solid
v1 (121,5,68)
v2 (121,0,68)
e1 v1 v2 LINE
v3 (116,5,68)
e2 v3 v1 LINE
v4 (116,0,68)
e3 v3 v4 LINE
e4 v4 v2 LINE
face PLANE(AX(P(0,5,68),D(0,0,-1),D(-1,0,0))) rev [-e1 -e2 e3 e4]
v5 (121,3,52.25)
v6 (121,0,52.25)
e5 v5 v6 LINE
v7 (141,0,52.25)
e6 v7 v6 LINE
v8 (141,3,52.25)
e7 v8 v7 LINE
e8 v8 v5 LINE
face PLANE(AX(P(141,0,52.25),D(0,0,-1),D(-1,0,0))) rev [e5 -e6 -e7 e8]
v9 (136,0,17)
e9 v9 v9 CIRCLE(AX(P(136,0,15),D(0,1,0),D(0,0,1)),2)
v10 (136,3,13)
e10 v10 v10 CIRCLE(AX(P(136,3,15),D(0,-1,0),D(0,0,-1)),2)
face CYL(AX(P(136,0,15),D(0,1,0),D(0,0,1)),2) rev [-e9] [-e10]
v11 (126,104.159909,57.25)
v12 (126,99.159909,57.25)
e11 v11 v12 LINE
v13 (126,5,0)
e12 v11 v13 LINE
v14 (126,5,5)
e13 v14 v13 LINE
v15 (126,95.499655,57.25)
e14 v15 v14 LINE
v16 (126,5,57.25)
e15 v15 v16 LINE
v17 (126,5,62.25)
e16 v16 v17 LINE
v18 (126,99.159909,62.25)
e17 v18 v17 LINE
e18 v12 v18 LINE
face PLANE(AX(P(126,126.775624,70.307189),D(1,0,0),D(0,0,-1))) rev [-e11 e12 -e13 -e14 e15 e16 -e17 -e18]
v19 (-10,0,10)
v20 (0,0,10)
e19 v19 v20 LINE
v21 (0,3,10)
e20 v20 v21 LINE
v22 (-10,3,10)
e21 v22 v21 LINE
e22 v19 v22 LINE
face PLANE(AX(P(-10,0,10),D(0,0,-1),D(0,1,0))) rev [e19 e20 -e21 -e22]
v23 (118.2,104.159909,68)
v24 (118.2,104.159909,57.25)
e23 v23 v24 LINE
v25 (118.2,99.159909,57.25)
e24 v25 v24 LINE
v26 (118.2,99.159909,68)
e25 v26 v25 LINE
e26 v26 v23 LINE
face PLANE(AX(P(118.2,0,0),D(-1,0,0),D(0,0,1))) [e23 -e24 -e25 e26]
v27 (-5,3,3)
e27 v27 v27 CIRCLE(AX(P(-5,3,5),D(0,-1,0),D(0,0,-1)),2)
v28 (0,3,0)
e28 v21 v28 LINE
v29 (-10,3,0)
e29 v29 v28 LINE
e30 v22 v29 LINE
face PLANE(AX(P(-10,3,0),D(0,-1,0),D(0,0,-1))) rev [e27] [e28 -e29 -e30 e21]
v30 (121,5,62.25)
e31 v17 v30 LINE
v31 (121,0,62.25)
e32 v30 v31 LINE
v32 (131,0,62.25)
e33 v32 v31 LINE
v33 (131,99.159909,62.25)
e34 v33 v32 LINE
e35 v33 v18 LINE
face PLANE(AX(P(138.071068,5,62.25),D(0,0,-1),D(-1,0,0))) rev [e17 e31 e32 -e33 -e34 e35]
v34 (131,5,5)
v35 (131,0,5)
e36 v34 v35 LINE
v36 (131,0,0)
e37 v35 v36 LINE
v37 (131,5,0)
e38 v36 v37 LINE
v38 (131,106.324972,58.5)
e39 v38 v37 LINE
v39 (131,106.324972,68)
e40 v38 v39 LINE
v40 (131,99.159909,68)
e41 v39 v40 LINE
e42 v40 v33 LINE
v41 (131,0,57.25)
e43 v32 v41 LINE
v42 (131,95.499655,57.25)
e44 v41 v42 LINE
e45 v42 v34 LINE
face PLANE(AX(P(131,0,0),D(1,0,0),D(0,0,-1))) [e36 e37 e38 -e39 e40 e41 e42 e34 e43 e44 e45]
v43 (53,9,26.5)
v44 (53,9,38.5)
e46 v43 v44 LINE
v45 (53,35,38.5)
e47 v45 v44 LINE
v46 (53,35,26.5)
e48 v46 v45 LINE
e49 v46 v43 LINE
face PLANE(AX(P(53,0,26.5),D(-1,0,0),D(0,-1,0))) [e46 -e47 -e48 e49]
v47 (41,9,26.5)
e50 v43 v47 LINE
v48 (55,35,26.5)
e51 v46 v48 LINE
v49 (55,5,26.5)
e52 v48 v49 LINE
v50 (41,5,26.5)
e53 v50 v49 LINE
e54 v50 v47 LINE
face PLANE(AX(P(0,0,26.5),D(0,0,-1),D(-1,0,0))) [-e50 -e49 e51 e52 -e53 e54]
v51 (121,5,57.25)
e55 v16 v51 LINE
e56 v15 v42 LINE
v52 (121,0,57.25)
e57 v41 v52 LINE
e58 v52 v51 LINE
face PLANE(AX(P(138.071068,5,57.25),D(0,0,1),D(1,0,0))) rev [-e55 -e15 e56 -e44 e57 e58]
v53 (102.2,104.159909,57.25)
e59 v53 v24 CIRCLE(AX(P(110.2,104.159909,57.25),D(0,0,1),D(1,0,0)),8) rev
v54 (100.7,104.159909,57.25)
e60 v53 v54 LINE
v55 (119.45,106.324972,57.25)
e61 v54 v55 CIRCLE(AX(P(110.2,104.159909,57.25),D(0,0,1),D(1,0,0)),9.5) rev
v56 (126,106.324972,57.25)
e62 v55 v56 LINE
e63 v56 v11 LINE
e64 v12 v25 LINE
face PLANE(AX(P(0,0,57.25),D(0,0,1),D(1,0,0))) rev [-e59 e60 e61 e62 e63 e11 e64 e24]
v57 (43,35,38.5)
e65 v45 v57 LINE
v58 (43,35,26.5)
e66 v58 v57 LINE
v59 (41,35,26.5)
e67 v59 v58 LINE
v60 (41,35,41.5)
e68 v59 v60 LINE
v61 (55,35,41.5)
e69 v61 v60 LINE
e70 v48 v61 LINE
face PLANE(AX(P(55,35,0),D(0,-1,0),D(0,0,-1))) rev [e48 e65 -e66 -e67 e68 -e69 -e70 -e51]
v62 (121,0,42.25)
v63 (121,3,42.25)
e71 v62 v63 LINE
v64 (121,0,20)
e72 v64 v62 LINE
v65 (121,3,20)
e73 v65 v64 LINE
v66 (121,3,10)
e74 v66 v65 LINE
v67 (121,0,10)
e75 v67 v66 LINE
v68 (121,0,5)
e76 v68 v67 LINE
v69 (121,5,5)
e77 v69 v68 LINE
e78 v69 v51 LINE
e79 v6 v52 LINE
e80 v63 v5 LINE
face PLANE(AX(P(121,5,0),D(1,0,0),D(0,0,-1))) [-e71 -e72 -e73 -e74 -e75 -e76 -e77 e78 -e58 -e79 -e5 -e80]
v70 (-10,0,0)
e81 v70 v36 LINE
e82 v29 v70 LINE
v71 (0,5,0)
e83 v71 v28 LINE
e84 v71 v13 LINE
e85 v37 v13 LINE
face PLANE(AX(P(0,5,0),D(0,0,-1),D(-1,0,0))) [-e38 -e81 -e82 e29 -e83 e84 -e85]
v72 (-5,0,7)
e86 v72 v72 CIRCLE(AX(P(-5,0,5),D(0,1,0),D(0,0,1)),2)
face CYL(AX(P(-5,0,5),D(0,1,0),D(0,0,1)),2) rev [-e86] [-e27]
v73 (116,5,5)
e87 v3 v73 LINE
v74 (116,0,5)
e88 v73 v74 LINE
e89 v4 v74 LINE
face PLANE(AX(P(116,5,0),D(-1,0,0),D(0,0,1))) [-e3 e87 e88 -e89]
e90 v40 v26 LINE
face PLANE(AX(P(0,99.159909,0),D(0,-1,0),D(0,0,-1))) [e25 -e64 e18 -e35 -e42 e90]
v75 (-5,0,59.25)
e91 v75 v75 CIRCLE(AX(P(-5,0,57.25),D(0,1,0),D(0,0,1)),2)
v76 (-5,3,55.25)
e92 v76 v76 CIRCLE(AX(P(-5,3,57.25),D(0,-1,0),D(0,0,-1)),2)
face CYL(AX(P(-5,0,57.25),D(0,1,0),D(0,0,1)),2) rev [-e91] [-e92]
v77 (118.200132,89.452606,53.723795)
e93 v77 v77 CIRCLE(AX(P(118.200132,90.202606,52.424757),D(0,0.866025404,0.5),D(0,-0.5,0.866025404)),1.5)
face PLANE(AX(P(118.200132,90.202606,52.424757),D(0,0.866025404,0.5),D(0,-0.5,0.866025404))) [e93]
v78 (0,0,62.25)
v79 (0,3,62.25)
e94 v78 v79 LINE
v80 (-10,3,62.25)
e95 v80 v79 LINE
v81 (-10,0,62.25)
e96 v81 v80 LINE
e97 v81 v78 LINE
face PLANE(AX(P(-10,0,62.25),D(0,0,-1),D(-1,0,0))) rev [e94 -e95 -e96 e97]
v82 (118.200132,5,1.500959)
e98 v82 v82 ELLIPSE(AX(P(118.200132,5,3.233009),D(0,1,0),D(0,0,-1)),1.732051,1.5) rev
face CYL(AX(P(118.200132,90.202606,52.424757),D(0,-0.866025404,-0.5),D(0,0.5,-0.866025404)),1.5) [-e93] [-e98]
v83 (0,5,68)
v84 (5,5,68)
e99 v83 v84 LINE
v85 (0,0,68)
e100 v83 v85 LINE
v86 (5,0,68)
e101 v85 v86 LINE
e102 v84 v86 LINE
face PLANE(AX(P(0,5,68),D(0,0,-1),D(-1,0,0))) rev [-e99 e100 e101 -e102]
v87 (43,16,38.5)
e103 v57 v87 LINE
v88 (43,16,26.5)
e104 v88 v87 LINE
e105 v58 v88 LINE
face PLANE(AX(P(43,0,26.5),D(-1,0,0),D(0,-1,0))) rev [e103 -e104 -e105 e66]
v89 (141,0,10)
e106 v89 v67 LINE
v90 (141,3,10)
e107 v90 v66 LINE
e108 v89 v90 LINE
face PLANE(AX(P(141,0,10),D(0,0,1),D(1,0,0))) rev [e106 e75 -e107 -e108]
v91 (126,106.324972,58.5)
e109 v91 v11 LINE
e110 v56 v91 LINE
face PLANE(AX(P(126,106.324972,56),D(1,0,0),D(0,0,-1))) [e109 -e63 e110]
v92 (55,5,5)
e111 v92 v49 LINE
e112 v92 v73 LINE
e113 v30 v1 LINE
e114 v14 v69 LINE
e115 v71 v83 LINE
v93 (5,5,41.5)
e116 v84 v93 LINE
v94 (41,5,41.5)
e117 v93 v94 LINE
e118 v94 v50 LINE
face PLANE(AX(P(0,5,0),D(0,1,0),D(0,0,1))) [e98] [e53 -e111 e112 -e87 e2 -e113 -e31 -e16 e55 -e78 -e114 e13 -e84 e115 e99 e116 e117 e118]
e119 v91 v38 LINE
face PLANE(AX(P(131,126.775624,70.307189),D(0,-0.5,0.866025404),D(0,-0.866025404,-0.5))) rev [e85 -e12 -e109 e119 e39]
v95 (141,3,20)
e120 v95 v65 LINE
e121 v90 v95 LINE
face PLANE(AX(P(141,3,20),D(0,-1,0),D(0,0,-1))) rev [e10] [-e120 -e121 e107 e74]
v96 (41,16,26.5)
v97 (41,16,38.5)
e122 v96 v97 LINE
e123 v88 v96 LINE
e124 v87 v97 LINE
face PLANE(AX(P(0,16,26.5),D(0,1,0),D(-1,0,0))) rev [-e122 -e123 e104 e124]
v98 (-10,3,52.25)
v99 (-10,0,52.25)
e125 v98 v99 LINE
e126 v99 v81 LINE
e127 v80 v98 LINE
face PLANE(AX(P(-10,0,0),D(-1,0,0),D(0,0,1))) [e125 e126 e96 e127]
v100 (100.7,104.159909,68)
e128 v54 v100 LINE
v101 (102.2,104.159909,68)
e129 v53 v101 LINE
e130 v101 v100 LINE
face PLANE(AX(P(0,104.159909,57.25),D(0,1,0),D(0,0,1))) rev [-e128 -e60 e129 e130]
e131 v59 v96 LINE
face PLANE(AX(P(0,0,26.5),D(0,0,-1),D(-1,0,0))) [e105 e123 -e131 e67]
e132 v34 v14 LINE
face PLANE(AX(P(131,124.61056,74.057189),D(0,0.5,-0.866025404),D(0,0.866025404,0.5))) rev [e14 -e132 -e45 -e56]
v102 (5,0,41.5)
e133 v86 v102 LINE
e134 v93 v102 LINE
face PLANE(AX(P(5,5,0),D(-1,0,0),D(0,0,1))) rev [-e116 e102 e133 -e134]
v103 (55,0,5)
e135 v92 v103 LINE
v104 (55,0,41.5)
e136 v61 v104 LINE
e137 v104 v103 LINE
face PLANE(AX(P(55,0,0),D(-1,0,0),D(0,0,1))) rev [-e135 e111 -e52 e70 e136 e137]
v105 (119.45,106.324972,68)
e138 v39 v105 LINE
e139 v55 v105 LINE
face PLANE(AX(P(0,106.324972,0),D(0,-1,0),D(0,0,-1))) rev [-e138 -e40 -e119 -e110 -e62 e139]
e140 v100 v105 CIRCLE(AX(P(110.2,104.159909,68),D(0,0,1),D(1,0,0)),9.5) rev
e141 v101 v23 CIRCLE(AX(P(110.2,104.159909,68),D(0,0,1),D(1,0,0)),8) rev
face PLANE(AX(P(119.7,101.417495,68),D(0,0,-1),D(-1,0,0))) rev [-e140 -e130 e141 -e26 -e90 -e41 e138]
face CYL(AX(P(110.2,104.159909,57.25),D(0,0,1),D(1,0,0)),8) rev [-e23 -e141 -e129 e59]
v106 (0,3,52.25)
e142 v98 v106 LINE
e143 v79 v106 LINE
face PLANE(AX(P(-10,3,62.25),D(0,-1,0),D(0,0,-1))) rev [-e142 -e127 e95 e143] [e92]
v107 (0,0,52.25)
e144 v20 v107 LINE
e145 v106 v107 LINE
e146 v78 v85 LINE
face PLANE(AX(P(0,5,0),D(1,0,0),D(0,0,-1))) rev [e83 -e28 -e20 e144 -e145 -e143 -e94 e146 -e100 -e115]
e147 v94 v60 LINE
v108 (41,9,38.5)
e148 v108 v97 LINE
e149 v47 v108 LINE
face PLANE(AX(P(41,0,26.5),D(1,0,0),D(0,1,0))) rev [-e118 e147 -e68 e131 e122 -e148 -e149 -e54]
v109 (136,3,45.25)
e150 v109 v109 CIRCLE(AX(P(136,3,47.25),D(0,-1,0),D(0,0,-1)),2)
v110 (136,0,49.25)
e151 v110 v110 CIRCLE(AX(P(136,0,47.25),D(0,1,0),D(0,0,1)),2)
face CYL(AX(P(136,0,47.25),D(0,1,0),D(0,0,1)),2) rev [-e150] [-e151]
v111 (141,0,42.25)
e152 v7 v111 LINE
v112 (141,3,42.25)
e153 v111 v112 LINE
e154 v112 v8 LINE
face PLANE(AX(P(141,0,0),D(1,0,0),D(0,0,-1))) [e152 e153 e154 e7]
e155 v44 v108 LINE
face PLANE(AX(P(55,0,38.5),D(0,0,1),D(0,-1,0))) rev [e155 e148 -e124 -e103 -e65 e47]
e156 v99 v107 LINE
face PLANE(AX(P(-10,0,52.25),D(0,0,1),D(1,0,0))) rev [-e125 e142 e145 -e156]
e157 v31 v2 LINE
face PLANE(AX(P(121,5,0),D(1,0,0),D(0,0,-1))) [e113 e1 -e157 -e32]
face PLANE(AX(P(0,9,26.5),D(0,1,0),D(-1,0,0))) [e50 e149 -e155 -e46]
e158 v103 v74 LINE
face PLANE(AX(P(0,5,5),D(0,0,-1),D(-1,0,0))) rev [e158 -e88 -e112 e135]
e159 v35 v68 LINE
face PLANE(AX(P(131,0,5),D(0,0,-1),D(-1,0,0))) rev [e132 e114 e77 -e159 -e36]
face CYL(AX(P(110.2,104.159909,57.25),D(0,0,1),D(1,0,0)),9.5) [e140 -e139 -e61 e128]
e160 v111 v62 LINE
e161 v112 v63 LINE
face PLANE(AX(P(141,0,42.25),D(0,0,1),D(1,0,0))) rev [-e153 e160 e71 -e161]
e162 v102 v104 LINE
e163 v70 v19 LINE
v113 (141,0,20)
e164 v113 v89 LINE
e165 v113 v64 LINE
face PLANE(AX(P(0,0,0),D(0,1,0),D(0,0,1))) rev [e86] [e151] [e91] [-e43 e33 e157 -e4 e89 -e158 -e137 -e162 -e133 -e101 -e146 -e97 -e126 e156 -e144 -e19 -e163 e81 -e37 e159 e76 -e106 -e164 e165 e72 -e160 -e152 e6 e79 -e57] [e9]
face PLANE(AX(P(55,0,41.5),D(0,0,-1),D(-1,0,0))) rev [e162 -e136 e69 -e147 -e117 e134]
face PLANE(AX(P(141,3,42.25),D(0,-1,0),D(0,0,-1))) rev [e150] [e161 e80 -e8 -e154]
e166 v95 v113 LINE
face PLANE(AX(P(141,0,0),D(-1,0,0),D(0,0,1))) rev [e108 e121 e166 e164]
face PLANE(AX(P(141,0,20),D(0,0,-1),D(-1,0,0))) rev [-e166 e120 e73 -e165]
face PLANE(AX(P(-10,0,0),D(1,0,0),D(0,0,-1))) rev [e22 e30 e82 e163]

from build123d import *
from OCP.BRepAlgoAPI import BRepAlgoAPI_Cut
from OCP.TopTools import TopTools_ListOfShape

# Parameters (mm, degrees)
BOSS_EXTRUDE1_DEPTH              = 5
SKETCH2_R                        = 1.5
BOSS_EXTRUDE2_DEPTH              = 100
SKETCH3_W                        = 5
SKETCH3_H                        = 5
BOSS_EXTRUDE3_DEPTH              = 10
SKETCH5_W                        = 5
SKETCH5_H                        = 4.330127019
BOSS_EXTRUDE4_DEPTH              = 117
SKETCH6_W                        = 5
SKETCH6_H                        = 5
BOSS_EXTRUDE5_DEPTH              = 20
BOSS_EXTRUDE6_DEPTH              = 15
SKETCH9_W                        = 5
SKETCH9_H                        = 5
BOSS_EXTRUDE7_DEPTH              = 10
SKETCH10_W                       = 5
SKETCH10_H                       = 5
BOSS_EXTRUDE8_DEPTH              = 99.159909
SKETCH11_W                       = 10
SKETCH11_H                       = 3
BOSS_EXTRUDE9_DEPTH              = 10
CUT_EXTRUDE1_DEPTH               = 187.084790711
CUT_EXTRUDE1_DEPTH_BACK          = 187.084790711
SKETCH13_R                       = 2
SKETCH14_W                       = 10
SKETCH14_H                       = 3
BOSS_EXTRUDE10_DEPTH             = 20
CUT_EXTRUDE2_DEPTH               = 194.255140511
CUT_EXTRUDE2_DEPTH_BACK          = 194.255140511
SKETCH15_R                       = 2
BOSS_EXTRUDE11_DEPTH             = 7.8
CUT_EXTRUDE3_DEPTH               = 187.016127587
CUT_EXTRUDE3_DEPTH_BACK          = 187.016127587
SKETCH17_W                       = 22.17902444
SKETCH17_H                       = 20
BOSS_EXTRUDE12_DEPTH             = 5.75
BOSS_EXTRUDE12_DEPTH_BACK        = 5
SKETCH19_W                       = 1.5
SKETCH19_H                       = 10.75
BOSS_EXTRUDE13_DEPTH             = 2.742414
SKETCH21_W                       = 1.5
SKETCH21_H                       = 1
BOSS_EXTRUDE15_DEPTH             = 1
BOSS_EXTRUDE17_REACH             = 195.512
CUT_EXTRUDE4_START               = 2
SKETCH23_W                       = 7.8
SKETCH23_H                       = 12
CUT_EXTRUDE4_DEPTH               = 10
BOSS_EXTRUDE19_DEPTH             = 5
BOSS_EXTRUDE19_DEPTH_BACK        = 2.165064
SKETCH23_2_W                     = 7.8
SKETCH23_2_H                     = 12
CUT_EXTRUDE5_DEPTH               = 1.25
BOSS_EXTRUDE20_REACH             = 188.016
SKETCH25_W                       = 5
SKETCH25_H                       = 4.330127019
SKETCH26_W                       = 5
SKETCH26_H                       = 2.16506351
CUT_EXTRUDE6_DEPTH               = 5
SKETCH27_W                       = 5.75
SKETCH27_H                       = 7.16506351
BOSS_EXTRUDE21_DEPTH             = 5
SKETCH29_W                       = 3
SKETCH29_H                       = 30
BOSS_EXTRUDE22_DEPTH             = 55
SKETCH30_W                       = 5
SKETCH30_H                       = 3
BOSS_EXTRUDE23_DEPTH             = 5
SKETCH31_W                       = 5
SKETCH31_H                       = 5
BOSS_EXTRUDE24_DEPTH             = 33.5
SKETCH32_W                       = 2
SKETCH32_H                       = 19
BOSS_EXTRUDE25_DEPTH             = 12
SKETCH34_W                       = 41
SKETCH34_H                       = 3
CUT_EXTRUDE7_DEPTH               = 30
SKETCH35_W                       = 14
SKETCH35_H                       = 12
BOSS_EXTRUDE26_DEPTH             = 7
BOSS_EXTRUDE27_REACH             = 187.154
SKETCH36_W                       = 9
SKETCH36_H                       = 5
BOSS_EXTRUDE27_DIRECTION_2_REACH = 187.154
SKETCH37_W                       = 41.5
SKETCH37_H                       = 5
BOSS_EXTRUDE28_DEPTH             = 41


with BuildPart() as part:
    # Sketch1 → Boss-Extrude1 (new body)
    with BuildSketch(Plane(origin=(0, 0, 0), x_dir=(1, 0, 0), z_dir=(0, 1, 0))):
        Polygon((121, 0), (0, 0), (0, -68), (5, -68), (5, -5), (116, -5), (116, -68), (121, -68), align=None)
    extrude(amount=BOSS_EXTRUDE1_DEPTH)

    # Sketch2 → Boss-Extrude2 (add)
    with BuildSketch(Plane(origin=(0, 3.75, 2.165063509), x_dir=(1, 0, 0), z_dir=(0, 0.866025403784438, 0.500000000000001))):
        with Locations(Location((118.200131686, -0.299868314, 0), (0, 0, 90))):
            Circle(SKETCH2_R)
    extrude(amount=BOSS_EXTRUDE2_DEPTH)

    # Sketch3 → Boss-Extrude3 (add)
    with BuildSketch(Plane(origin=(121, 0, 0), x_dir=(0, 0, -1), z_dir=(1, 0, 0))):
        with Locations((-2.5, 2.5)):
            Rectangle(SKETCH3_W, SKETCH3_H)
    extrude(amount=BOSS_EXTRUDE3_DEPTH)

    # Sketch5 → Boss-Extrude4 (add)
    with BuildSketch(Plane(origin=(0, 3.75, 2.165063509), x_dir=(1, 0, 0), z_dir=(0, 0.866025403784438, 0.500000000000001))):
        with Locations((128.5, 0.33493649)):
            Rectangle(SKETCH5_W, SKETCH5_H)
    extrude(amount=BOSS_EXTRUDE4_DEPTH)

    # Sketch6 → Boss-Extrude5 (add)
    with BuildSketch(Plane(origin=(0, 1.25, -2.165063509), x_dir=(-1, 0, 0), z_dir=(0, 0.500000000000001, -0.8660254037844382))):
        with Locations((-128.5, 118.830127019)):
            Rectangle(SKETCH6_W, SKETCH6_H)
    extrude(amount=BOSS_EXTRUDE5_DEPTH)

    # Sketch7 → Boss-Extrude6 (add)
    with BuildSketch(Plane.ZY.offset(-126)):
        Polygon((45.509618943, 113.824972243), (41.179491924, 116.324972243), (38.679491924, 111.994845224), (43.009618943, 109.494845224), align=None)
    extrude(amount=BOSS_EXTRUDE6_DEPTH)

    # Sketch9 → Boss-Extrude7 (add)
    with BuildSketch(Plane(origin=(121, 0, 0), x_dir=(0, 0, -1), z_dir=(1, 0, 0))):
        with Locations((-59.75, 2.5)):
            Rectangle(SKETCH9_W, SKETCH9_H)
    extrude(amount=BOSS_EXTRUDE7_DEPTH)

    # Sketch10 → Boss-Extrude8 (add)
    with BuildSketch(Plane(origin=(0, 5, 0), x_dir=(1, 0, 0), z_dir=(0, 1, 0))):
        with Locations((128.5, -59.75)):
            Rectangle(SKETCH10_W, SKETCH10_H)
    extrude(amount=BOSS_EXTRUDE8_DEPTH)

    # Sketch11 → Boss-Extrude9 (add)
    with BuildSketch(Plane.ZY):
        with Locations((57.25, 1.5)):
            Rectangle(SKETCH11_W, SKETCH11_H)
        with Locations((5, 1.5)):
            Rectangle(SKETCH11_W, SKETCH11_H)
    extrude(amount=BOSS_EXTRUDE9_DEPTH)

    # Sketch13 → Cut-Extrude1 (cut, two sides: drawn at the far end of the back side and taken through both)
    with BuildSketch(Plane(origin=(0, 3, 0), x_dir=(1, 0, 0), z_dir=(0, 1, 0)).offset(-CUT_EXTRUDE1_DEPTH_BACK)):
        with Locations(Location((-5, -5, 0), (0, 0, 270))):
            Circle(SKETCH13_R)
        with Locations(Location((-5, -57.25, 0), (0, 0, 270))):
            Circle(SKETCH13_R)
    extrude(amount=CUT_EXTRUDE1_DEPTH + CUT_EXTRUDE1_DEPTH_BACK, mode=Mode.SUBTRACT)

    # Sketch14 → Boss-Extrude10 (add)
    with BuildSketch(Plane(origin=(121, 0, 0), x_dir=(0, 0, -1), z_dir=(1, 0, 0))):
        with Locations((-15, 1.5)):
            Rectangle(SKETCH14_W, SKETCH14_H)
        with Locations((-47.25, 1.5)):
            Rectangle(SKETCH14_W, SKETCH14_H)
    extrude(amount=BOSS_EXTRUDE10_DEPTH)

    # Sketch15 → Cut-Extrude2 (cut, two sides: drawn at the far end of the back side and taken through both)
    with BuildSketch(Plane(origin=(0, 3, 0), x_dir=(1, 0, 0), z_dir=(0, 1, 0)).offset(-CUT_EXTRUDE2_DEPTH_BACK)):
        with Locations(Location((136, -15, 0), (0, 0, 270))):
            Circle(SKETCH15_R)
        with Locations(Location((136, -47.25, 0), (0, 0, 270))):
            Circle(SKETCH15_R)
    extrude(amount=CUT_EXTRUDE2_DEPTH + CUT_EXTRUDE2_DEPTH_BACK, mode=Mode.SUBTRACT)

    # Sketch16 → Boss-Extrude11 (add)
    with BuildSketch(Plane.ZY.offset(-126)):
        Polygon((49.839745962, 111.324972243), (67, 101.417494955), (64.5, 97.087367936), (47.339745962, 106.994845224), align=None)
    extrude(amount=BOSS_EXTRUDE11_DEPTH)

    # Sketch17 → Cut-Extrude3 (cut, two sides: drawn at the far end of the back side and taken through both)
    with BuildSketch(Plane(origin=(0, 105.074972243, 60.665063509), x_dir=(1, 0, 0), z_dir=(0, 0.8660254037844382, 0.500000000000001)).offset(-CUT_EXTRUDE3_DEPTH_BACK)):
        with Locations((119.91048778, 12.5)):
            Rectangle(SKETCH17_W, SKETCH17_H)
    extrude(amount=CUT_EXTRUDE3_DEPTH + CUT_EXTRUDE3_DEPTH_BACK, mode=Mode.SUBTRACT)



with BuildPart() as body_2:
    # Sketch18 → Boss-Extrude12 (new, two sides: drawn at the far end of the back side and taken through both)
    with BuildSketch(Plane.XY.offset(62.25).offset(-BOSS_EXTRUDE12_DEPTH_BACK)):
        with BuildLine():
            Line((118.2, 104.159908733), (119.7, 104.159908733))
            ThreePointArc((119.7, 104.159908733), (110.2, 113.659908733), (100.7, 104.159908733))
            Line((100.7, 104.159908733), (102.2, 104.159908733))
            ThreePointArc((102.2, 104.159908733), (110.2, 112.159908733), (118.2, 104.159908733))
        make_face()
    extrude(amount=BOSS_EXTRUDE12_DEPTH + BOSS_EXTRUDE12_DEPTH_BACK)


with BuildPart() as part_1:
    add(part.part)

    add(body_2.part)  # Boss-Extrude13 merges body 2
    # Sketch19 → Boss-Extrude13 (add)
    with BuildSketch(Plane.XZ.offset(-104.159908733)):
        with Locations((118.95, 62.625)):
            Rectangle(SKETCH19_W, SKETCH19_H)
    extrude(amount=BOSS_EXTRUDE13_DEPTH)

    # Sketch21 → Boss-Extrude15 (add)
    with BuildSketch(Plane.XZ.offset(-101.417494955)):
        with Locations((118.95, 67.5)):
            Rectangle(SKETCH21_W, SKETCH21_H)
    extrude(amount=BOSS_EXTRUDE15_DEPTH)

    # Boss-Extrude17: up to this plane
    boss_extrude17_end = Plane(origin=(119.7, 101.417494955, 68), z_dir=(0, 0, -1))
    # Sketch20 → Boss-Extrude17 (add, up to the surface)
    with BuildSketch(Plane(origin=(0, -3.657477288, 6.334936491), x_dir=(1, 0, 0), z_dir=(0, -0.5000000000000039, 0.8660254037844365)), mode=Mode.PRIVATE) as boss_extrude17_sk1:
        Polygon((126, 116.330127019), (126, 121.330127019), (119.7, 121.330127019), (118.2, 121.330127019), (118.2, 116.330127019), align=None)
    boss_extrude17_tool1 = split(extrude(boss_extrude17_sk1.sketch, amount=BOSS_EXTRUDE17_REACH, mode=Mode.PRIVATE), bisect_by=boss_extrude17_end, keep=Keep.BOTH, mode=Mode.PRIVATE)
    add(boss_extrude17_tool1.solids().sort_by_distance((122.1, 99.252431, 65.75))[0])

    # Sketch23 → Cut-Extrude4 (cut)
    with BuildSketch(Plane(origin=(0, 104.159908733, 0), x_dir=(-1, 0, 0), z_dir=(0, -1, 0)).offset(CUT_EXTRUDE4_START)):
        with Locations((-122.1, -62)):
            Rectangle(SKETCH23_W, SKETCH23_H)
    extrude(amount=CUT_EXTRUDE4_DEPTH, mode=Mode.SUBTRACT)

    # Sketch23<2> → Boss-Extrude19 (add, two sides: drawn at the far end of the back side and taken through both)
    with BuildSketch(Plane(origin=(0, 104.159908733, 0), x_dir=(-1, 0, 0), z_dir=(0, -1, 0)).offset(-BOSS_EXTRUDE19_DEPTH_BACK)):
        with Locations((-122.1, -62)):
            Rectangle(SKETCH23_2_W, SKETCH23_2_H)
    extrude(amount=BOSS_EXTRUDE19_DEPTH + BOSS_EXTRUDE19_DEPTH_BACK)


with BuildPart() as cut_extrude5_tool:
    # Sketch24 → Cut-Extrude5 (new body)
    with BuildSketch(Plane(origin=(0, 0, 56), x_dir=(-1, 0, 0), z_dir=(0, 0, -1))):
        Polygon((-126, 106.324972243), (-126, 101.994845224), (-126, 99.159908733), (-118.2, 99.159908733), (-118.2, 106.324972243), align=None)
    extrude(amount=-CUT_EXTRUDE5_DEPTH)


with BuildPart() as part_2:
    add(part_1.part)

    # Cut-Extrude5: cut by cut_extrude5_tool, with a tolerance
    cut_extrude5_stock = TopTools_ListOfShape()
    cut_extrude5_stock.Append(part_2.part.wrapped)
    cut_extrude5_tools = TopTools_ListOfShape()
    cut_extrude5_tools.Append(cut_extrude5_tool.part.wrapped)
    cut_extrude5_cut = BRepAlgoAPI_Cut()
    cut_extrude5_cut.SetArguments(cut_extrude5_stock)
    cut_extrude5_cut.SetTools(cut_extrude5_tools)
    cut_extrude5_cut.SetFuzzyValue(0.00001)
    cut_extrude5_cut.Build()
    add(Compound.cast(cut_extrude5_cut.Shape()).solids(), mode=Mode.REPLACE)

    # Boss-Extrude20: up to this face of the body (flat: up to its plane)
    boss_extrude20_end = Plane(part_2.part.faces().sort_by_distance((122.724999943, 106.324972733, 62.625))[0])
    # Sketch25 → Boss-Extrude20 (add, up to the picked face)
    with BuildSketch(Plane(origin=(0, 105.074972243, 60.665063509), x_dir=(1, 0, 0), z_dir=(0, 0.8660254037844382, 0.500000000000001)), mode=Mode.PRIVATE) as boss_extrude20_sk1:
        with Locations((128.5, 0.33493649)):
            Rectangle(SKETCH25_W, SKETCH25_H)
    boss_extrude20_tool1 = split(extrude(boss_extrude20_sk1.sketch, amount=BOSS_EXTRUDE20_REACH, mode=Mode.PRIVATE), bisect_by=boss_extrude20_end, keep=Keep.BOTH, mode=Mode.PRIVATE)
    add(boss_extrude20_tool1.solids().sort_by(Axis((128.5, 105.24244, 60.375), (0, 0.8660254037844382, 0.500000000000001)))[0])


with BuildPart() as cut_extrude6_tool:
    # Sketch26 → Cut-Extrude6 (new body)
    with BuildSketch(Plane.XY.offset(62.25)):
        with Locations((128.5, 105.242440488)):
            Rectangle(SKETCH26_W, SKETCH26_H)
    extrude(amount=CUT_EXTRUDE6_DEPTH)


with BuildPart() as part_3:
    add(part_2.part)

    # Cut-Extrude6: cut by cut_extrude6_tool, with a tolerance
    cut_extrude6_stock = TopTools_ListOfShape()
    cut_extrude6_stock.Append(part_3.part.wrapped)
    cut_extrude6_tools = TopTools_ListOfShape()
    cut_extrude6_tools.Append(cut_extrude6_tool.part.wrapped)
    cut_extrude6_cut = BRepAlgoAPI_Cut()
    cut_extrude6_cut.SetArguments(cut_extrude6_stock)
    cut_extrude6_cut.SetTools(cut_extrude6_tools)
    cut_extrude6_cut.SetFuzzyValue(0.00001)
    cut_extrude6_cut.Build()
    add(Compound.cast(cut_extrude6_cut.Shape()).solids(), mode=Mode.REPLACE)

    # Sketch27 → Boss-Extrude21 (add)
    with BuildSketch(Plane(origin=(126, 0, 0), x_dir=(0, 0, -1), z_dir=(1, 0, 0))):
        with Locations((-65.125, 102.742440488)):
            Rectangle(SKETCH27_W, SKETCH27_H)
    extrude(amount=BOSS_EXTRUDE21_DEPTH)

    # Sketch29 → Boss-Extrude22 (add)
    with BuildSketch(Plane.ZY):
        with Locations((40, 20)):
            Rectangle(SKETCH29_W, SKETCH29_H)
    extrude(amount=-BOSS_EXTRUDE22_DEPTH)

    # Sketch30 → Boss-Extrude23 (add)
    with BuildSketch(Plane.XZ.offset(-5)):
        with Locations((52.5, 40)):
            Rectangle(SKETCH30_W, SKETCH30_H)
    extrude(amount=BOSS_EXTRUDE23_DEPTH)

    # Sketch31 → Boss-Extrude24 (add)
    with BuildSketch(Plane(origin=(0, 0, 38.5), x_dir=(-1, 0, 0), z_dir=(0, 0, -1))):
        with Locations((-52.5, 2.5)):
            Rectangle(SKETCH31_W, SKETCH31_H)
    extrude(amount=BOSS_EXTRUDE24_DEPTH)

    # Sketch32 → Boss-Extrude25 (add)
    with BuildSketch(Plane(origin=(0, 0, 38.5), x_dir=(-1, 0, 0), z_dir=(0, 0, -1))):
        Polygon((-41, 9), (-53, 9), (-53, 35), (-55, 35), (-55, 7), (-41, 7), align=None)
        with Locations((-42, 25.5)):
            Rectangle(SKETCH32_W, SKETCH32_H)
    extrude(amount=BOSS_EXTRUDE25_DEPTH)

    # Sketch34 → Cut-Extrude7 (cut)
    with BuildSketch(Plane(origin=(0, 35, 0), x_dir=(1, 0, 0), z_dir=(0, 1, 0))):
        with Locations((20.5, -40)):
            Rectangle(SKETCH34_W, SKETCH34_H)
    extrude(amount=-CUT_EXTRUDE7_DEPTH, mode=Mode.SUBTRACT)

    # Sketch35 → Boss-Extrude26 (add)
    with BuildSketch(Plane.XZ.offset(-7)):
        with Locations((48, 32.5)):
            Rectangle(SKETCH35_W, SKETCH35_H)
    extrude(amount=BOSS_EXTRUDE26_DEPTH)

    # Boss-Extrude27: up to this face of the body (flat: up to its plane)
    boss_extrude27_end = Plane(part_3.part.faces().sort_by_distance((48.252808989, 19.016853933, 41.5))[0])
    # Sketch36 → Boss-Extrude27 (add, up to the picked face)
    with BuildSketch(Plane.XY.offset(38.5), mode=Mode.PRIVATE) as boss_extrude27_sk1:
        with Locations((45.5, 2.5)):
            Rectangle(SKETCH36_W, SKETCH36_H)
    boss_extrude27_tool1 = split(extrude(boss_extrude27_sk1.sketch, amount=BOSS_EXTRUDE27_REACH, mode=Mode.PRIVATE), bisect_by=boss_extrude27_end, keep=Keep.BOTH, mode=Mode.PRIVATE)
    add(boss_extrude27_tool1.solids().sort_by(Axis((45.5, 2.5, 38.5), (0, 0, 1)))[0])

    # Boss-Extrude27 direction 2: up to this face of the body (flat: up to its plane)
    boss_extrude27_direction_2_end = Plane(part_3.part.faces().sort_by_distance((27.5, 2.5, 5))[0])
    # Sketch36 → Boss-Extrude27 direction 2 (add, up to the picked face)
    with BuildSketch(Plane.XY.offset(38.5), mode=Mode.PRIVATE) as boss_extrude27_direction_2_sk1:
        with Locations((45.5, 2.5)):
            Rectangle(SKETCH36_W, SKETCH36_H)
    boss_extrude27_direction_2_tool1 = split(extrude(boss_extrude27_direction_2_sk1.sketch, amount=-BOSS_EXTRUDE27_DIRECTION_2_REACH, mode=Mode.PRIVATE), bisect_by=boss_extrude27_direction_2_end, keep=Keep.BOTH, mode=Mode.PRIVATE)
    add(boss_extrude27_direction_2_tool1.solids().sort_by(Axis((45.5, 2.5, 38.5), (0, 0, -1)))[0])

    # Sketch37 → Boss-Extrude28 (add)
    with BuildSketch(Plane.ZY.offset(-41)):
        with Locations((20.75, 2.5)):
            Rectangle(SKETCH37_W, SKETCH37_H)
    extrude(amount=BOSS_EXTRUDE28_DEPTH)


solid = part_3.part
